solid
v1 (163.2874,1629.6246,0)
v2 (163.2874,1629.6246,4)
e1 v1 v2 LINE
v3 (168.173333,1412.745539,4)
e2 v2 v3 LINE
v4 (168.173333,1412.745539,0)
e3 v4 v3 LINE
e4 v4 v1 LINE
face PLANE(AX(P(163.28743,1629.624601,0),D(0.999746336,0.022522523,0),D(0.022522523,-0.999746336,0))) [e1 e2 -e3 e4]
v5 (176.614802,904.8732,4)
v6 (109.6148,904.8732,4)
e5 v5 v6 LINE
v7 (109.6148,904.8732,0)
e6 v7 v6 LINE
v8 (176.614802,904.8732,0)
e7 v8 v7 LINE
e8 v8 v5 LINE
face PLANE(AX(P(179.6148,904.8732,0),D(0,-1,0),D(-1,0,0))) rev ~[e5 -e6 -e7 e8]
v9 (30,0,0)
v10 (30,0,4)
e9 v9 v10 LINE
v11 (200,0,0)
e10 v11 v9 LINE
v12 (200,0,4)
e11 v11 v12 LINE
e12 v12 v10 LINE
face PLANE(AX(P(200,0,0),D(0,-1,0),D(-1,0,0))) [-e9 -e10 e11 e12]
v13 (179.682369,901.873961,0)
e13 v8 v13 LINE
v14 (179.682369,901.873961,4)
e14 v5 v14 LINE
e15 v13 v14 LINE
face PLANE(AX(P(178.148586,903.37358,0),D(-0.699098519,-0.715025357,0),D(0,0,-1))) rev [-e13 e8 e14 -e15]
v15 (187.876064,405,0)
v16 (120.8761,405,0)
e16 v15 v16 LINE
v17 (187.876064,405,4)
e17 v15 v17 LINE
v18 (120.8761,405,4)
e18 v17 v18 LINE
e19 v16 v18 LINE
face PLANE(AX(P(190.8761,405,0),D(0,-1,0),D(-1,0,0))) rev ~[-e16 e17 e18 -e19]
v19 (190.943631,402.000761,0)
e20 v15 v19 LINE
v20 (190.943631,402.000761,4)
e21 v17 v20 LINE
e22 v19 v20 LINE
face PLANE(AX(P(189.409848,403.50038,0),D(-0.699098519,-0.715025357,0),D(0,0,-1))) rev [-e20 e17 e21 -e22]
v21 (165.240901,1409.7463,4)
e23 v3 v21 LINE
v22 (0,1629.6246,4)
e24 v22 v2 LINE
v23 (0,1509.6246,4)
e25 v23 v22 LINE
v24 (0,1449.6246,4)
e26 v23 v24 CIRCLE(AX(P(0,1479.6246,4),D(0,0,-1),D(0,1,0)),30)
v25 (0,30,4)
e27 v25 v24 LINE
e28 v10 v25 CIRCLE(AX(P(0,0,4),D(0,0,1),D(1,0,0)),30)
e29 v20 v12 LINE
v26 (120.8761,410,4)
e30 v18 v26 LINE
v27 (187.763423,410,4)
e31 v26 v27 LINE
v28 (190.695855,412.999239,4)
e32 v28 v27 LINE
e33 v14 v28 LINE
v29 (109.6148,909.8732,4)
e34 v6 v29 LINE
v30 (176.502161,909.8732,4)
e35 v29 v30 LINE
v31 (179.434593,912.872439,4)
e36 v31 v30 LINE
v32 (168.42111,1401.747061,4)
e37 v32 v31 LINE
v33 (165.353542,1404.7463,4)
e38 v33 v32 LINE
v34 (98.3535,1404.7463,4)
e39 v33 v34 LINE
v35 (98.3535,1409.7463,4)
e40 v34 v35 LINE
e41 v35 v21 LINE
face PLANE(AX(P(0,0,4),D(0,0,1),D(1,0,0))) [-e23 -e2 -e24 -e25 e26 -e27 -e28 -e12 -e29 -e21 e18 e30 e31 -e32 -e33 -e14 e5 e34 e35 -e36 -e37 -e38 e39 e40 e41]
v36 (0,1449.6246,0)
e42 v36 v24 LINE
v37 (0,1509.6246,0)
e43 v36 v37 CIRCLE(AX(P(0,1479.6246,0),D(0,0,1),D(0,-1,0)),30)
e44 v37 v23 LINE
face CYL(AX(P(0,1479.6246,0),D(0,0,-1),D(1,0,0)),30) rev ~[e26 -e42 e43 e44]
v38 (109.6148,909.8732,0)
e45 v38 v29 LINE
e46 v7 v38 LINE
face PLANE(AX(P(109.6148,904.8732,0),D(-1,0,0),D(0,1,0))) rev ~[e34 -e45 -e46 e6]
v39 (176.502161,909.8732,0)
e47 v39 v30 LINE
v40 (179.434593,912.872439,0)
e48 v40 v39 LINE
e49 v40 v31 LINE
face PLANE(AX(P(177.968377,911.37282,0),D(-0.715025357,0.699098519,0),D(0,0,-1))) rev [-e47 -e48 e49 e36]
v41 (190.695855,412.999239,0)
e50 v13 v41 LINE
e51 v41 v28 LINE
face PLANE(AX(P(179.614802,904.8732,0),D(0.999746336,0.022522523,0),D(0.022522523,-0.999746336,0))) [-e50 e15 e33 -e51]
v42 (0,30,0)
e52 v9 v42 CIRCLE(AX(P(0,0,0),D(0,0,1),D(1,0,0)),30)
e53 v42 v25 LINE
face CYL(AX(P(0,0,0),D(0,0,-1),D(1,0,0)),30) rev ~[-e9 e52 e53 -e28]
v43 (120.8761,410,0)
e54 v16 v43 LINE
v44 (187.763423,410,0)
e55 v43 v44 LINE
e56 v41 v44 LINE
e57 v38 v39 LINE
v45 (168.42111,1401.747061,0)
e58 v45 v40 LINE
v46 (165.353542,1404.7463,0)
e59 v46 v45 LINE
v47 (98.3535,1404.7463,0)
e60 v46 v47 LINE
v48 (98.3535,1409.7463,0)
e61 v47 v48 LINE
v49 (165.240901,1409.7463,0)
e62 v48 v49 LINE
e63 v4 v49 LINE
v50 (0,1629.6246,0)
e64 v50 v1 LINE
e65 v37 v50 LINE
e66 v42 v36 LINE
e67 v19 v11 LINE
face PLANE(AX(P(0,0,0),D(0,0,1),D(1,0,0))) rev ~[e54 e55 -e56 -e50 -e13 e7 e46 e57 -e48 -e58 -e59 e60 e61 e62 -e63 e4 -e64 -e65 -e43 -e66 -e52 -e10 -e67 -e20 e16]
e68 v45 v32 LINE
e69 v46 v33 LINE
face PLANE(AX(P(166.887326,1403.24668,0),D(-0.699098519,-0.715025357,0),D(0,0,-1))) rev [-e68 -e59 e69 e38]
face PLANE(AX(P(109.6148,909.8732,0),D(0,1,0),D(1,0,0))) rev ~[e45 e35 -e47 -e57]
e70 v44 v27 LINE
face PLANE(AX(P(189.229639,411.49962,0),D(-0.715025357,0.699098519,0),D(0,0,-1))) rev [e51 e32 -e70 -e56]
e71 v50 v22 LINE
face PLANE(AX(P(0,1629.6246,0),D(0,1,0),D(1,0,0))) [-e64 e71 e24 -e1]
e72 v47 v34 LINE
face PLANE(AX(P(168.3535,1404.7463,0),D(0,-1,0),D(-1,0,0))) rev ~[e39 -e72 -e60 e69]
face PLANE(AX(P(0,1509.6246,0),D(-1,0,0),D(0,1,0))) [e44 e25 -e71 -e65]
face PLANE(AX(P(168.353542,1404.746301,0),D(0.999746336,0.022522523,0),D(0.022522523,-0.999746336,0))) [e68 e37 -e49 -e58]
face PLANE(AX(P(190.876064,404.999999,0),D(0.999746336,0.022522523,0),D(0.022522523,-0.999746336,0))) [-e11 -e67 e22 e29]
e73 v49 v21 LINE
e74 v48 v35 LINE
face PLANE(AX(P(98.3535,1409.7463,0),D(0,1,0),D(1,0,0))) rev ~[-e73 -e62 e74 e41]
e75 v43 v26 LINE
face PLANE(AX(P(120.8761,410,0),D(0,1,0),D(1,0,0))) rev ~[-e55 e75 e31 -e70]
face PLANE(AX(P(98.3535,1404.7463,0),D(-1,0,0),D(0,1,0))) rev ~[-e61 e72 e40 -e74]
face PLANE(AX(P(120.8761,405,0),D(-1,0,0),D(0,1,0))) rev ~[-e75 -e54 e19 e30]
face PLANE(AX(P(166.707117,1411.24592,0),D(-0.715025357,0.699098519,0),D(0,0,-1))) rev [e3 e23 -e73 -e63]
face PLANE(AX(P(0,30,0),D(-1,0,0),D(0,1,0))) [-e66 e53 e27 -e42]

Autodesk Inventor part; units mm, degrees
ref_plane "YZ Plane" through (0, 0, 0) normal (1, 0, 0) x (0, 1, 0)
ref_plane "XZ Plane" through (0, 0, 0) normal (0, 1, 0) x (-1, 0, 0)
ref_plane "XY Plane" through (0, 0, 0) normal (0, 0, 1) x (1, 0, 0)
sketch "Sketch1" plane through (0, 0, 0) normal (0, 0, 1) x (1, 0, 0)
  line L0 (0, 0) -> (0, 4438.8737)
  line L1 (0, 4438.8737) -> (100, 4438.8737)
  line L2 (100, 4438.8737) -> (200, 0)
  line L3 (200, 0) -> (0, 0)
  circle A0 centre (0, 0) radius 30
  line L4 (0, 1479.6246) -> (166.6667, 1479.6246)
  line L5 (0, 2959.2492) -> (133.3333, 2959.2492)
  circle A1 centre (0, 1479.6246) radius 30
  circle A2 centre (0, 2959.2492) radius 30
  line L6 (190.8761, 405) -> (120.8761, 405)
  line L7 (120.8761, 405) -> (120.8761, 410)
  line L8 (120.8761, 410) -> (190.8761, 410)
  line L9 (190.8761, 410) -> (190.8761, 405)
  line L10 (109.6148, 909.8732) -> (179.6148, 909.8732)
  line L11 (179.6148, 904.8732) -> (109.6148, 904.8732)
  line L12 (109.6148, 904.8732) -> (109.6148, 909.8732)
  line L13 (179.6148, 909.8732) -> (179.6148, 904.8732)
  line L14 (98.3535, 1409.7463) -> (168.3535, 1409.7463)
  line L15 (168.3535, 1404.7463) -> (98.3535, 1404.7463)
  line L16 (98.3535, 1404.7463) -> (98.3535, 1409.7463)
  line L17 (168.3535, 1409.7463) -> (168.3535, 1404.7463)
  line L18 (87.0923, 1909.6195) -> (157.0923, 1909.6195)
  line L19 (157.0923, 1904.6195) -> (87.0923, 1904.6195)
  line L20 (87.0923, 1904.6195) -> (87.0923, 1909.6195)
  line L21 (157.0923, 1909.6195) -> (157.0923, 1904.6195)
  line L22 (75.831, 2409.4927) -> (145.831, 2409.4927)
  line L23 (145.831, 2404.4927) -> (75.831, 2404.4927)
  line L24 (75.831, 2404.4927) -> (75.831, 2409.4927)
  line L25 (145.831, 2409.4927) -> (145.831, 2404.4927)
  line L26 (64.5698, 2909.3658) -> (134.5698, 2909.3658)
  line L27 (134.5698, 2904.3658) -> (64.5698, 2904.3658)
  line L28 (64.5698, 2904.3658) -> (64.5698, 2909.3658)
  line L29 (134.5698, 2909.3658) -> (134.5698, 2904.3658)
  line L30 (53.3085, 3409.239) -> (123.3085, 3409.239)
  line L31 (123.3085, 3404.239) -> (53.3085, 3404.239)
  line L32 (53.3085, 3404.239) -> (53.3085, 3409.239)
  line L33 (123.3085, 3409.239) -> (123.3085, 3404.239)
  line L34 (42.0472, 3909.1122) -> (112.0472, 3909.1122)
  line L35 (112.0472, 3904.1122) -> (42.0472, 3904.1122)
  line L36 (42.0472, 3904.1122) -> (42.0472, 3909.1122)
  line L37 (112.0472, 3909.1122) -> (112.0472, 3904.1122)
  line L38 (0, 1629.6246) -> (163.2874, 1629.6246)
  line L39 (0, 3079.2492) -> (130.6299, 3079.2492)
  point P0 (30, 2959.2492)
  point P1 (0, 2929.2492)
  point P2 (0, 1509.6246)
  point P3 (0, 1449.6246)
  point P4 (0, 30)
  point P5 (30, 0)
  point P6 (190.7634, 410)
  point P7 (179.5022, 909.8732)
  point P8 (168.3535, 1404.7463)
  point P9 (168.2409, 1409.7463)
  point P10 (30, 1479.6246)
  dimension "d65" = 100
  dimension "d67" = 200
  dimension "d68" = 60
  dimension "d69" = 1480
  dimension "d70" = 1480
  dimension "d71" = 1480
  dimension "d72" = 5
  dimension "d73" = 70
  dimension "d74" = 410
  dimension "d77" = 500
  dimension "d82" = 120
  dimension "d83" = 150
extrude "Plate3" add sketch "Sketch1" along normal blind 4 contours L38 L2 L4 A1 L0 | L4 L2 L14 L16 L15 L10 L12 L11 L8 L7 L6 L3 A0 L0 A1
chamfer "Corner Chamfer2" distance 3 angle 45 6 edges at (190.7634, 410, 2) (190.8761, 405, 2) (179.6148, 904.8732, 2) (179.5022, 909.8732, 2) (168.3535, 1404.7463, 2) (168.2409, 1409.7463, 2)
equation "\"BendRadius\" = Thickness"
equation "\"BendReliefWidth\" = Thickness"
equation "\"BendReliefDepth\" = 0.5 * Thickness"
equation "\"CornerReliefSize\" = 4 * Thickness"
equation "\"MinimumRemnant\" = 2 * Thickness"
equation "\"TransitionRadius\" = BendRadius"
equation "\"JacobiRadiusSize\" = BendRadius"
equation "\"GapSize\" = Thickness"
equation "\"Thickness\" = 4"
properties part number "GBK 3112 central main rib_CPY1" material "Steel"
